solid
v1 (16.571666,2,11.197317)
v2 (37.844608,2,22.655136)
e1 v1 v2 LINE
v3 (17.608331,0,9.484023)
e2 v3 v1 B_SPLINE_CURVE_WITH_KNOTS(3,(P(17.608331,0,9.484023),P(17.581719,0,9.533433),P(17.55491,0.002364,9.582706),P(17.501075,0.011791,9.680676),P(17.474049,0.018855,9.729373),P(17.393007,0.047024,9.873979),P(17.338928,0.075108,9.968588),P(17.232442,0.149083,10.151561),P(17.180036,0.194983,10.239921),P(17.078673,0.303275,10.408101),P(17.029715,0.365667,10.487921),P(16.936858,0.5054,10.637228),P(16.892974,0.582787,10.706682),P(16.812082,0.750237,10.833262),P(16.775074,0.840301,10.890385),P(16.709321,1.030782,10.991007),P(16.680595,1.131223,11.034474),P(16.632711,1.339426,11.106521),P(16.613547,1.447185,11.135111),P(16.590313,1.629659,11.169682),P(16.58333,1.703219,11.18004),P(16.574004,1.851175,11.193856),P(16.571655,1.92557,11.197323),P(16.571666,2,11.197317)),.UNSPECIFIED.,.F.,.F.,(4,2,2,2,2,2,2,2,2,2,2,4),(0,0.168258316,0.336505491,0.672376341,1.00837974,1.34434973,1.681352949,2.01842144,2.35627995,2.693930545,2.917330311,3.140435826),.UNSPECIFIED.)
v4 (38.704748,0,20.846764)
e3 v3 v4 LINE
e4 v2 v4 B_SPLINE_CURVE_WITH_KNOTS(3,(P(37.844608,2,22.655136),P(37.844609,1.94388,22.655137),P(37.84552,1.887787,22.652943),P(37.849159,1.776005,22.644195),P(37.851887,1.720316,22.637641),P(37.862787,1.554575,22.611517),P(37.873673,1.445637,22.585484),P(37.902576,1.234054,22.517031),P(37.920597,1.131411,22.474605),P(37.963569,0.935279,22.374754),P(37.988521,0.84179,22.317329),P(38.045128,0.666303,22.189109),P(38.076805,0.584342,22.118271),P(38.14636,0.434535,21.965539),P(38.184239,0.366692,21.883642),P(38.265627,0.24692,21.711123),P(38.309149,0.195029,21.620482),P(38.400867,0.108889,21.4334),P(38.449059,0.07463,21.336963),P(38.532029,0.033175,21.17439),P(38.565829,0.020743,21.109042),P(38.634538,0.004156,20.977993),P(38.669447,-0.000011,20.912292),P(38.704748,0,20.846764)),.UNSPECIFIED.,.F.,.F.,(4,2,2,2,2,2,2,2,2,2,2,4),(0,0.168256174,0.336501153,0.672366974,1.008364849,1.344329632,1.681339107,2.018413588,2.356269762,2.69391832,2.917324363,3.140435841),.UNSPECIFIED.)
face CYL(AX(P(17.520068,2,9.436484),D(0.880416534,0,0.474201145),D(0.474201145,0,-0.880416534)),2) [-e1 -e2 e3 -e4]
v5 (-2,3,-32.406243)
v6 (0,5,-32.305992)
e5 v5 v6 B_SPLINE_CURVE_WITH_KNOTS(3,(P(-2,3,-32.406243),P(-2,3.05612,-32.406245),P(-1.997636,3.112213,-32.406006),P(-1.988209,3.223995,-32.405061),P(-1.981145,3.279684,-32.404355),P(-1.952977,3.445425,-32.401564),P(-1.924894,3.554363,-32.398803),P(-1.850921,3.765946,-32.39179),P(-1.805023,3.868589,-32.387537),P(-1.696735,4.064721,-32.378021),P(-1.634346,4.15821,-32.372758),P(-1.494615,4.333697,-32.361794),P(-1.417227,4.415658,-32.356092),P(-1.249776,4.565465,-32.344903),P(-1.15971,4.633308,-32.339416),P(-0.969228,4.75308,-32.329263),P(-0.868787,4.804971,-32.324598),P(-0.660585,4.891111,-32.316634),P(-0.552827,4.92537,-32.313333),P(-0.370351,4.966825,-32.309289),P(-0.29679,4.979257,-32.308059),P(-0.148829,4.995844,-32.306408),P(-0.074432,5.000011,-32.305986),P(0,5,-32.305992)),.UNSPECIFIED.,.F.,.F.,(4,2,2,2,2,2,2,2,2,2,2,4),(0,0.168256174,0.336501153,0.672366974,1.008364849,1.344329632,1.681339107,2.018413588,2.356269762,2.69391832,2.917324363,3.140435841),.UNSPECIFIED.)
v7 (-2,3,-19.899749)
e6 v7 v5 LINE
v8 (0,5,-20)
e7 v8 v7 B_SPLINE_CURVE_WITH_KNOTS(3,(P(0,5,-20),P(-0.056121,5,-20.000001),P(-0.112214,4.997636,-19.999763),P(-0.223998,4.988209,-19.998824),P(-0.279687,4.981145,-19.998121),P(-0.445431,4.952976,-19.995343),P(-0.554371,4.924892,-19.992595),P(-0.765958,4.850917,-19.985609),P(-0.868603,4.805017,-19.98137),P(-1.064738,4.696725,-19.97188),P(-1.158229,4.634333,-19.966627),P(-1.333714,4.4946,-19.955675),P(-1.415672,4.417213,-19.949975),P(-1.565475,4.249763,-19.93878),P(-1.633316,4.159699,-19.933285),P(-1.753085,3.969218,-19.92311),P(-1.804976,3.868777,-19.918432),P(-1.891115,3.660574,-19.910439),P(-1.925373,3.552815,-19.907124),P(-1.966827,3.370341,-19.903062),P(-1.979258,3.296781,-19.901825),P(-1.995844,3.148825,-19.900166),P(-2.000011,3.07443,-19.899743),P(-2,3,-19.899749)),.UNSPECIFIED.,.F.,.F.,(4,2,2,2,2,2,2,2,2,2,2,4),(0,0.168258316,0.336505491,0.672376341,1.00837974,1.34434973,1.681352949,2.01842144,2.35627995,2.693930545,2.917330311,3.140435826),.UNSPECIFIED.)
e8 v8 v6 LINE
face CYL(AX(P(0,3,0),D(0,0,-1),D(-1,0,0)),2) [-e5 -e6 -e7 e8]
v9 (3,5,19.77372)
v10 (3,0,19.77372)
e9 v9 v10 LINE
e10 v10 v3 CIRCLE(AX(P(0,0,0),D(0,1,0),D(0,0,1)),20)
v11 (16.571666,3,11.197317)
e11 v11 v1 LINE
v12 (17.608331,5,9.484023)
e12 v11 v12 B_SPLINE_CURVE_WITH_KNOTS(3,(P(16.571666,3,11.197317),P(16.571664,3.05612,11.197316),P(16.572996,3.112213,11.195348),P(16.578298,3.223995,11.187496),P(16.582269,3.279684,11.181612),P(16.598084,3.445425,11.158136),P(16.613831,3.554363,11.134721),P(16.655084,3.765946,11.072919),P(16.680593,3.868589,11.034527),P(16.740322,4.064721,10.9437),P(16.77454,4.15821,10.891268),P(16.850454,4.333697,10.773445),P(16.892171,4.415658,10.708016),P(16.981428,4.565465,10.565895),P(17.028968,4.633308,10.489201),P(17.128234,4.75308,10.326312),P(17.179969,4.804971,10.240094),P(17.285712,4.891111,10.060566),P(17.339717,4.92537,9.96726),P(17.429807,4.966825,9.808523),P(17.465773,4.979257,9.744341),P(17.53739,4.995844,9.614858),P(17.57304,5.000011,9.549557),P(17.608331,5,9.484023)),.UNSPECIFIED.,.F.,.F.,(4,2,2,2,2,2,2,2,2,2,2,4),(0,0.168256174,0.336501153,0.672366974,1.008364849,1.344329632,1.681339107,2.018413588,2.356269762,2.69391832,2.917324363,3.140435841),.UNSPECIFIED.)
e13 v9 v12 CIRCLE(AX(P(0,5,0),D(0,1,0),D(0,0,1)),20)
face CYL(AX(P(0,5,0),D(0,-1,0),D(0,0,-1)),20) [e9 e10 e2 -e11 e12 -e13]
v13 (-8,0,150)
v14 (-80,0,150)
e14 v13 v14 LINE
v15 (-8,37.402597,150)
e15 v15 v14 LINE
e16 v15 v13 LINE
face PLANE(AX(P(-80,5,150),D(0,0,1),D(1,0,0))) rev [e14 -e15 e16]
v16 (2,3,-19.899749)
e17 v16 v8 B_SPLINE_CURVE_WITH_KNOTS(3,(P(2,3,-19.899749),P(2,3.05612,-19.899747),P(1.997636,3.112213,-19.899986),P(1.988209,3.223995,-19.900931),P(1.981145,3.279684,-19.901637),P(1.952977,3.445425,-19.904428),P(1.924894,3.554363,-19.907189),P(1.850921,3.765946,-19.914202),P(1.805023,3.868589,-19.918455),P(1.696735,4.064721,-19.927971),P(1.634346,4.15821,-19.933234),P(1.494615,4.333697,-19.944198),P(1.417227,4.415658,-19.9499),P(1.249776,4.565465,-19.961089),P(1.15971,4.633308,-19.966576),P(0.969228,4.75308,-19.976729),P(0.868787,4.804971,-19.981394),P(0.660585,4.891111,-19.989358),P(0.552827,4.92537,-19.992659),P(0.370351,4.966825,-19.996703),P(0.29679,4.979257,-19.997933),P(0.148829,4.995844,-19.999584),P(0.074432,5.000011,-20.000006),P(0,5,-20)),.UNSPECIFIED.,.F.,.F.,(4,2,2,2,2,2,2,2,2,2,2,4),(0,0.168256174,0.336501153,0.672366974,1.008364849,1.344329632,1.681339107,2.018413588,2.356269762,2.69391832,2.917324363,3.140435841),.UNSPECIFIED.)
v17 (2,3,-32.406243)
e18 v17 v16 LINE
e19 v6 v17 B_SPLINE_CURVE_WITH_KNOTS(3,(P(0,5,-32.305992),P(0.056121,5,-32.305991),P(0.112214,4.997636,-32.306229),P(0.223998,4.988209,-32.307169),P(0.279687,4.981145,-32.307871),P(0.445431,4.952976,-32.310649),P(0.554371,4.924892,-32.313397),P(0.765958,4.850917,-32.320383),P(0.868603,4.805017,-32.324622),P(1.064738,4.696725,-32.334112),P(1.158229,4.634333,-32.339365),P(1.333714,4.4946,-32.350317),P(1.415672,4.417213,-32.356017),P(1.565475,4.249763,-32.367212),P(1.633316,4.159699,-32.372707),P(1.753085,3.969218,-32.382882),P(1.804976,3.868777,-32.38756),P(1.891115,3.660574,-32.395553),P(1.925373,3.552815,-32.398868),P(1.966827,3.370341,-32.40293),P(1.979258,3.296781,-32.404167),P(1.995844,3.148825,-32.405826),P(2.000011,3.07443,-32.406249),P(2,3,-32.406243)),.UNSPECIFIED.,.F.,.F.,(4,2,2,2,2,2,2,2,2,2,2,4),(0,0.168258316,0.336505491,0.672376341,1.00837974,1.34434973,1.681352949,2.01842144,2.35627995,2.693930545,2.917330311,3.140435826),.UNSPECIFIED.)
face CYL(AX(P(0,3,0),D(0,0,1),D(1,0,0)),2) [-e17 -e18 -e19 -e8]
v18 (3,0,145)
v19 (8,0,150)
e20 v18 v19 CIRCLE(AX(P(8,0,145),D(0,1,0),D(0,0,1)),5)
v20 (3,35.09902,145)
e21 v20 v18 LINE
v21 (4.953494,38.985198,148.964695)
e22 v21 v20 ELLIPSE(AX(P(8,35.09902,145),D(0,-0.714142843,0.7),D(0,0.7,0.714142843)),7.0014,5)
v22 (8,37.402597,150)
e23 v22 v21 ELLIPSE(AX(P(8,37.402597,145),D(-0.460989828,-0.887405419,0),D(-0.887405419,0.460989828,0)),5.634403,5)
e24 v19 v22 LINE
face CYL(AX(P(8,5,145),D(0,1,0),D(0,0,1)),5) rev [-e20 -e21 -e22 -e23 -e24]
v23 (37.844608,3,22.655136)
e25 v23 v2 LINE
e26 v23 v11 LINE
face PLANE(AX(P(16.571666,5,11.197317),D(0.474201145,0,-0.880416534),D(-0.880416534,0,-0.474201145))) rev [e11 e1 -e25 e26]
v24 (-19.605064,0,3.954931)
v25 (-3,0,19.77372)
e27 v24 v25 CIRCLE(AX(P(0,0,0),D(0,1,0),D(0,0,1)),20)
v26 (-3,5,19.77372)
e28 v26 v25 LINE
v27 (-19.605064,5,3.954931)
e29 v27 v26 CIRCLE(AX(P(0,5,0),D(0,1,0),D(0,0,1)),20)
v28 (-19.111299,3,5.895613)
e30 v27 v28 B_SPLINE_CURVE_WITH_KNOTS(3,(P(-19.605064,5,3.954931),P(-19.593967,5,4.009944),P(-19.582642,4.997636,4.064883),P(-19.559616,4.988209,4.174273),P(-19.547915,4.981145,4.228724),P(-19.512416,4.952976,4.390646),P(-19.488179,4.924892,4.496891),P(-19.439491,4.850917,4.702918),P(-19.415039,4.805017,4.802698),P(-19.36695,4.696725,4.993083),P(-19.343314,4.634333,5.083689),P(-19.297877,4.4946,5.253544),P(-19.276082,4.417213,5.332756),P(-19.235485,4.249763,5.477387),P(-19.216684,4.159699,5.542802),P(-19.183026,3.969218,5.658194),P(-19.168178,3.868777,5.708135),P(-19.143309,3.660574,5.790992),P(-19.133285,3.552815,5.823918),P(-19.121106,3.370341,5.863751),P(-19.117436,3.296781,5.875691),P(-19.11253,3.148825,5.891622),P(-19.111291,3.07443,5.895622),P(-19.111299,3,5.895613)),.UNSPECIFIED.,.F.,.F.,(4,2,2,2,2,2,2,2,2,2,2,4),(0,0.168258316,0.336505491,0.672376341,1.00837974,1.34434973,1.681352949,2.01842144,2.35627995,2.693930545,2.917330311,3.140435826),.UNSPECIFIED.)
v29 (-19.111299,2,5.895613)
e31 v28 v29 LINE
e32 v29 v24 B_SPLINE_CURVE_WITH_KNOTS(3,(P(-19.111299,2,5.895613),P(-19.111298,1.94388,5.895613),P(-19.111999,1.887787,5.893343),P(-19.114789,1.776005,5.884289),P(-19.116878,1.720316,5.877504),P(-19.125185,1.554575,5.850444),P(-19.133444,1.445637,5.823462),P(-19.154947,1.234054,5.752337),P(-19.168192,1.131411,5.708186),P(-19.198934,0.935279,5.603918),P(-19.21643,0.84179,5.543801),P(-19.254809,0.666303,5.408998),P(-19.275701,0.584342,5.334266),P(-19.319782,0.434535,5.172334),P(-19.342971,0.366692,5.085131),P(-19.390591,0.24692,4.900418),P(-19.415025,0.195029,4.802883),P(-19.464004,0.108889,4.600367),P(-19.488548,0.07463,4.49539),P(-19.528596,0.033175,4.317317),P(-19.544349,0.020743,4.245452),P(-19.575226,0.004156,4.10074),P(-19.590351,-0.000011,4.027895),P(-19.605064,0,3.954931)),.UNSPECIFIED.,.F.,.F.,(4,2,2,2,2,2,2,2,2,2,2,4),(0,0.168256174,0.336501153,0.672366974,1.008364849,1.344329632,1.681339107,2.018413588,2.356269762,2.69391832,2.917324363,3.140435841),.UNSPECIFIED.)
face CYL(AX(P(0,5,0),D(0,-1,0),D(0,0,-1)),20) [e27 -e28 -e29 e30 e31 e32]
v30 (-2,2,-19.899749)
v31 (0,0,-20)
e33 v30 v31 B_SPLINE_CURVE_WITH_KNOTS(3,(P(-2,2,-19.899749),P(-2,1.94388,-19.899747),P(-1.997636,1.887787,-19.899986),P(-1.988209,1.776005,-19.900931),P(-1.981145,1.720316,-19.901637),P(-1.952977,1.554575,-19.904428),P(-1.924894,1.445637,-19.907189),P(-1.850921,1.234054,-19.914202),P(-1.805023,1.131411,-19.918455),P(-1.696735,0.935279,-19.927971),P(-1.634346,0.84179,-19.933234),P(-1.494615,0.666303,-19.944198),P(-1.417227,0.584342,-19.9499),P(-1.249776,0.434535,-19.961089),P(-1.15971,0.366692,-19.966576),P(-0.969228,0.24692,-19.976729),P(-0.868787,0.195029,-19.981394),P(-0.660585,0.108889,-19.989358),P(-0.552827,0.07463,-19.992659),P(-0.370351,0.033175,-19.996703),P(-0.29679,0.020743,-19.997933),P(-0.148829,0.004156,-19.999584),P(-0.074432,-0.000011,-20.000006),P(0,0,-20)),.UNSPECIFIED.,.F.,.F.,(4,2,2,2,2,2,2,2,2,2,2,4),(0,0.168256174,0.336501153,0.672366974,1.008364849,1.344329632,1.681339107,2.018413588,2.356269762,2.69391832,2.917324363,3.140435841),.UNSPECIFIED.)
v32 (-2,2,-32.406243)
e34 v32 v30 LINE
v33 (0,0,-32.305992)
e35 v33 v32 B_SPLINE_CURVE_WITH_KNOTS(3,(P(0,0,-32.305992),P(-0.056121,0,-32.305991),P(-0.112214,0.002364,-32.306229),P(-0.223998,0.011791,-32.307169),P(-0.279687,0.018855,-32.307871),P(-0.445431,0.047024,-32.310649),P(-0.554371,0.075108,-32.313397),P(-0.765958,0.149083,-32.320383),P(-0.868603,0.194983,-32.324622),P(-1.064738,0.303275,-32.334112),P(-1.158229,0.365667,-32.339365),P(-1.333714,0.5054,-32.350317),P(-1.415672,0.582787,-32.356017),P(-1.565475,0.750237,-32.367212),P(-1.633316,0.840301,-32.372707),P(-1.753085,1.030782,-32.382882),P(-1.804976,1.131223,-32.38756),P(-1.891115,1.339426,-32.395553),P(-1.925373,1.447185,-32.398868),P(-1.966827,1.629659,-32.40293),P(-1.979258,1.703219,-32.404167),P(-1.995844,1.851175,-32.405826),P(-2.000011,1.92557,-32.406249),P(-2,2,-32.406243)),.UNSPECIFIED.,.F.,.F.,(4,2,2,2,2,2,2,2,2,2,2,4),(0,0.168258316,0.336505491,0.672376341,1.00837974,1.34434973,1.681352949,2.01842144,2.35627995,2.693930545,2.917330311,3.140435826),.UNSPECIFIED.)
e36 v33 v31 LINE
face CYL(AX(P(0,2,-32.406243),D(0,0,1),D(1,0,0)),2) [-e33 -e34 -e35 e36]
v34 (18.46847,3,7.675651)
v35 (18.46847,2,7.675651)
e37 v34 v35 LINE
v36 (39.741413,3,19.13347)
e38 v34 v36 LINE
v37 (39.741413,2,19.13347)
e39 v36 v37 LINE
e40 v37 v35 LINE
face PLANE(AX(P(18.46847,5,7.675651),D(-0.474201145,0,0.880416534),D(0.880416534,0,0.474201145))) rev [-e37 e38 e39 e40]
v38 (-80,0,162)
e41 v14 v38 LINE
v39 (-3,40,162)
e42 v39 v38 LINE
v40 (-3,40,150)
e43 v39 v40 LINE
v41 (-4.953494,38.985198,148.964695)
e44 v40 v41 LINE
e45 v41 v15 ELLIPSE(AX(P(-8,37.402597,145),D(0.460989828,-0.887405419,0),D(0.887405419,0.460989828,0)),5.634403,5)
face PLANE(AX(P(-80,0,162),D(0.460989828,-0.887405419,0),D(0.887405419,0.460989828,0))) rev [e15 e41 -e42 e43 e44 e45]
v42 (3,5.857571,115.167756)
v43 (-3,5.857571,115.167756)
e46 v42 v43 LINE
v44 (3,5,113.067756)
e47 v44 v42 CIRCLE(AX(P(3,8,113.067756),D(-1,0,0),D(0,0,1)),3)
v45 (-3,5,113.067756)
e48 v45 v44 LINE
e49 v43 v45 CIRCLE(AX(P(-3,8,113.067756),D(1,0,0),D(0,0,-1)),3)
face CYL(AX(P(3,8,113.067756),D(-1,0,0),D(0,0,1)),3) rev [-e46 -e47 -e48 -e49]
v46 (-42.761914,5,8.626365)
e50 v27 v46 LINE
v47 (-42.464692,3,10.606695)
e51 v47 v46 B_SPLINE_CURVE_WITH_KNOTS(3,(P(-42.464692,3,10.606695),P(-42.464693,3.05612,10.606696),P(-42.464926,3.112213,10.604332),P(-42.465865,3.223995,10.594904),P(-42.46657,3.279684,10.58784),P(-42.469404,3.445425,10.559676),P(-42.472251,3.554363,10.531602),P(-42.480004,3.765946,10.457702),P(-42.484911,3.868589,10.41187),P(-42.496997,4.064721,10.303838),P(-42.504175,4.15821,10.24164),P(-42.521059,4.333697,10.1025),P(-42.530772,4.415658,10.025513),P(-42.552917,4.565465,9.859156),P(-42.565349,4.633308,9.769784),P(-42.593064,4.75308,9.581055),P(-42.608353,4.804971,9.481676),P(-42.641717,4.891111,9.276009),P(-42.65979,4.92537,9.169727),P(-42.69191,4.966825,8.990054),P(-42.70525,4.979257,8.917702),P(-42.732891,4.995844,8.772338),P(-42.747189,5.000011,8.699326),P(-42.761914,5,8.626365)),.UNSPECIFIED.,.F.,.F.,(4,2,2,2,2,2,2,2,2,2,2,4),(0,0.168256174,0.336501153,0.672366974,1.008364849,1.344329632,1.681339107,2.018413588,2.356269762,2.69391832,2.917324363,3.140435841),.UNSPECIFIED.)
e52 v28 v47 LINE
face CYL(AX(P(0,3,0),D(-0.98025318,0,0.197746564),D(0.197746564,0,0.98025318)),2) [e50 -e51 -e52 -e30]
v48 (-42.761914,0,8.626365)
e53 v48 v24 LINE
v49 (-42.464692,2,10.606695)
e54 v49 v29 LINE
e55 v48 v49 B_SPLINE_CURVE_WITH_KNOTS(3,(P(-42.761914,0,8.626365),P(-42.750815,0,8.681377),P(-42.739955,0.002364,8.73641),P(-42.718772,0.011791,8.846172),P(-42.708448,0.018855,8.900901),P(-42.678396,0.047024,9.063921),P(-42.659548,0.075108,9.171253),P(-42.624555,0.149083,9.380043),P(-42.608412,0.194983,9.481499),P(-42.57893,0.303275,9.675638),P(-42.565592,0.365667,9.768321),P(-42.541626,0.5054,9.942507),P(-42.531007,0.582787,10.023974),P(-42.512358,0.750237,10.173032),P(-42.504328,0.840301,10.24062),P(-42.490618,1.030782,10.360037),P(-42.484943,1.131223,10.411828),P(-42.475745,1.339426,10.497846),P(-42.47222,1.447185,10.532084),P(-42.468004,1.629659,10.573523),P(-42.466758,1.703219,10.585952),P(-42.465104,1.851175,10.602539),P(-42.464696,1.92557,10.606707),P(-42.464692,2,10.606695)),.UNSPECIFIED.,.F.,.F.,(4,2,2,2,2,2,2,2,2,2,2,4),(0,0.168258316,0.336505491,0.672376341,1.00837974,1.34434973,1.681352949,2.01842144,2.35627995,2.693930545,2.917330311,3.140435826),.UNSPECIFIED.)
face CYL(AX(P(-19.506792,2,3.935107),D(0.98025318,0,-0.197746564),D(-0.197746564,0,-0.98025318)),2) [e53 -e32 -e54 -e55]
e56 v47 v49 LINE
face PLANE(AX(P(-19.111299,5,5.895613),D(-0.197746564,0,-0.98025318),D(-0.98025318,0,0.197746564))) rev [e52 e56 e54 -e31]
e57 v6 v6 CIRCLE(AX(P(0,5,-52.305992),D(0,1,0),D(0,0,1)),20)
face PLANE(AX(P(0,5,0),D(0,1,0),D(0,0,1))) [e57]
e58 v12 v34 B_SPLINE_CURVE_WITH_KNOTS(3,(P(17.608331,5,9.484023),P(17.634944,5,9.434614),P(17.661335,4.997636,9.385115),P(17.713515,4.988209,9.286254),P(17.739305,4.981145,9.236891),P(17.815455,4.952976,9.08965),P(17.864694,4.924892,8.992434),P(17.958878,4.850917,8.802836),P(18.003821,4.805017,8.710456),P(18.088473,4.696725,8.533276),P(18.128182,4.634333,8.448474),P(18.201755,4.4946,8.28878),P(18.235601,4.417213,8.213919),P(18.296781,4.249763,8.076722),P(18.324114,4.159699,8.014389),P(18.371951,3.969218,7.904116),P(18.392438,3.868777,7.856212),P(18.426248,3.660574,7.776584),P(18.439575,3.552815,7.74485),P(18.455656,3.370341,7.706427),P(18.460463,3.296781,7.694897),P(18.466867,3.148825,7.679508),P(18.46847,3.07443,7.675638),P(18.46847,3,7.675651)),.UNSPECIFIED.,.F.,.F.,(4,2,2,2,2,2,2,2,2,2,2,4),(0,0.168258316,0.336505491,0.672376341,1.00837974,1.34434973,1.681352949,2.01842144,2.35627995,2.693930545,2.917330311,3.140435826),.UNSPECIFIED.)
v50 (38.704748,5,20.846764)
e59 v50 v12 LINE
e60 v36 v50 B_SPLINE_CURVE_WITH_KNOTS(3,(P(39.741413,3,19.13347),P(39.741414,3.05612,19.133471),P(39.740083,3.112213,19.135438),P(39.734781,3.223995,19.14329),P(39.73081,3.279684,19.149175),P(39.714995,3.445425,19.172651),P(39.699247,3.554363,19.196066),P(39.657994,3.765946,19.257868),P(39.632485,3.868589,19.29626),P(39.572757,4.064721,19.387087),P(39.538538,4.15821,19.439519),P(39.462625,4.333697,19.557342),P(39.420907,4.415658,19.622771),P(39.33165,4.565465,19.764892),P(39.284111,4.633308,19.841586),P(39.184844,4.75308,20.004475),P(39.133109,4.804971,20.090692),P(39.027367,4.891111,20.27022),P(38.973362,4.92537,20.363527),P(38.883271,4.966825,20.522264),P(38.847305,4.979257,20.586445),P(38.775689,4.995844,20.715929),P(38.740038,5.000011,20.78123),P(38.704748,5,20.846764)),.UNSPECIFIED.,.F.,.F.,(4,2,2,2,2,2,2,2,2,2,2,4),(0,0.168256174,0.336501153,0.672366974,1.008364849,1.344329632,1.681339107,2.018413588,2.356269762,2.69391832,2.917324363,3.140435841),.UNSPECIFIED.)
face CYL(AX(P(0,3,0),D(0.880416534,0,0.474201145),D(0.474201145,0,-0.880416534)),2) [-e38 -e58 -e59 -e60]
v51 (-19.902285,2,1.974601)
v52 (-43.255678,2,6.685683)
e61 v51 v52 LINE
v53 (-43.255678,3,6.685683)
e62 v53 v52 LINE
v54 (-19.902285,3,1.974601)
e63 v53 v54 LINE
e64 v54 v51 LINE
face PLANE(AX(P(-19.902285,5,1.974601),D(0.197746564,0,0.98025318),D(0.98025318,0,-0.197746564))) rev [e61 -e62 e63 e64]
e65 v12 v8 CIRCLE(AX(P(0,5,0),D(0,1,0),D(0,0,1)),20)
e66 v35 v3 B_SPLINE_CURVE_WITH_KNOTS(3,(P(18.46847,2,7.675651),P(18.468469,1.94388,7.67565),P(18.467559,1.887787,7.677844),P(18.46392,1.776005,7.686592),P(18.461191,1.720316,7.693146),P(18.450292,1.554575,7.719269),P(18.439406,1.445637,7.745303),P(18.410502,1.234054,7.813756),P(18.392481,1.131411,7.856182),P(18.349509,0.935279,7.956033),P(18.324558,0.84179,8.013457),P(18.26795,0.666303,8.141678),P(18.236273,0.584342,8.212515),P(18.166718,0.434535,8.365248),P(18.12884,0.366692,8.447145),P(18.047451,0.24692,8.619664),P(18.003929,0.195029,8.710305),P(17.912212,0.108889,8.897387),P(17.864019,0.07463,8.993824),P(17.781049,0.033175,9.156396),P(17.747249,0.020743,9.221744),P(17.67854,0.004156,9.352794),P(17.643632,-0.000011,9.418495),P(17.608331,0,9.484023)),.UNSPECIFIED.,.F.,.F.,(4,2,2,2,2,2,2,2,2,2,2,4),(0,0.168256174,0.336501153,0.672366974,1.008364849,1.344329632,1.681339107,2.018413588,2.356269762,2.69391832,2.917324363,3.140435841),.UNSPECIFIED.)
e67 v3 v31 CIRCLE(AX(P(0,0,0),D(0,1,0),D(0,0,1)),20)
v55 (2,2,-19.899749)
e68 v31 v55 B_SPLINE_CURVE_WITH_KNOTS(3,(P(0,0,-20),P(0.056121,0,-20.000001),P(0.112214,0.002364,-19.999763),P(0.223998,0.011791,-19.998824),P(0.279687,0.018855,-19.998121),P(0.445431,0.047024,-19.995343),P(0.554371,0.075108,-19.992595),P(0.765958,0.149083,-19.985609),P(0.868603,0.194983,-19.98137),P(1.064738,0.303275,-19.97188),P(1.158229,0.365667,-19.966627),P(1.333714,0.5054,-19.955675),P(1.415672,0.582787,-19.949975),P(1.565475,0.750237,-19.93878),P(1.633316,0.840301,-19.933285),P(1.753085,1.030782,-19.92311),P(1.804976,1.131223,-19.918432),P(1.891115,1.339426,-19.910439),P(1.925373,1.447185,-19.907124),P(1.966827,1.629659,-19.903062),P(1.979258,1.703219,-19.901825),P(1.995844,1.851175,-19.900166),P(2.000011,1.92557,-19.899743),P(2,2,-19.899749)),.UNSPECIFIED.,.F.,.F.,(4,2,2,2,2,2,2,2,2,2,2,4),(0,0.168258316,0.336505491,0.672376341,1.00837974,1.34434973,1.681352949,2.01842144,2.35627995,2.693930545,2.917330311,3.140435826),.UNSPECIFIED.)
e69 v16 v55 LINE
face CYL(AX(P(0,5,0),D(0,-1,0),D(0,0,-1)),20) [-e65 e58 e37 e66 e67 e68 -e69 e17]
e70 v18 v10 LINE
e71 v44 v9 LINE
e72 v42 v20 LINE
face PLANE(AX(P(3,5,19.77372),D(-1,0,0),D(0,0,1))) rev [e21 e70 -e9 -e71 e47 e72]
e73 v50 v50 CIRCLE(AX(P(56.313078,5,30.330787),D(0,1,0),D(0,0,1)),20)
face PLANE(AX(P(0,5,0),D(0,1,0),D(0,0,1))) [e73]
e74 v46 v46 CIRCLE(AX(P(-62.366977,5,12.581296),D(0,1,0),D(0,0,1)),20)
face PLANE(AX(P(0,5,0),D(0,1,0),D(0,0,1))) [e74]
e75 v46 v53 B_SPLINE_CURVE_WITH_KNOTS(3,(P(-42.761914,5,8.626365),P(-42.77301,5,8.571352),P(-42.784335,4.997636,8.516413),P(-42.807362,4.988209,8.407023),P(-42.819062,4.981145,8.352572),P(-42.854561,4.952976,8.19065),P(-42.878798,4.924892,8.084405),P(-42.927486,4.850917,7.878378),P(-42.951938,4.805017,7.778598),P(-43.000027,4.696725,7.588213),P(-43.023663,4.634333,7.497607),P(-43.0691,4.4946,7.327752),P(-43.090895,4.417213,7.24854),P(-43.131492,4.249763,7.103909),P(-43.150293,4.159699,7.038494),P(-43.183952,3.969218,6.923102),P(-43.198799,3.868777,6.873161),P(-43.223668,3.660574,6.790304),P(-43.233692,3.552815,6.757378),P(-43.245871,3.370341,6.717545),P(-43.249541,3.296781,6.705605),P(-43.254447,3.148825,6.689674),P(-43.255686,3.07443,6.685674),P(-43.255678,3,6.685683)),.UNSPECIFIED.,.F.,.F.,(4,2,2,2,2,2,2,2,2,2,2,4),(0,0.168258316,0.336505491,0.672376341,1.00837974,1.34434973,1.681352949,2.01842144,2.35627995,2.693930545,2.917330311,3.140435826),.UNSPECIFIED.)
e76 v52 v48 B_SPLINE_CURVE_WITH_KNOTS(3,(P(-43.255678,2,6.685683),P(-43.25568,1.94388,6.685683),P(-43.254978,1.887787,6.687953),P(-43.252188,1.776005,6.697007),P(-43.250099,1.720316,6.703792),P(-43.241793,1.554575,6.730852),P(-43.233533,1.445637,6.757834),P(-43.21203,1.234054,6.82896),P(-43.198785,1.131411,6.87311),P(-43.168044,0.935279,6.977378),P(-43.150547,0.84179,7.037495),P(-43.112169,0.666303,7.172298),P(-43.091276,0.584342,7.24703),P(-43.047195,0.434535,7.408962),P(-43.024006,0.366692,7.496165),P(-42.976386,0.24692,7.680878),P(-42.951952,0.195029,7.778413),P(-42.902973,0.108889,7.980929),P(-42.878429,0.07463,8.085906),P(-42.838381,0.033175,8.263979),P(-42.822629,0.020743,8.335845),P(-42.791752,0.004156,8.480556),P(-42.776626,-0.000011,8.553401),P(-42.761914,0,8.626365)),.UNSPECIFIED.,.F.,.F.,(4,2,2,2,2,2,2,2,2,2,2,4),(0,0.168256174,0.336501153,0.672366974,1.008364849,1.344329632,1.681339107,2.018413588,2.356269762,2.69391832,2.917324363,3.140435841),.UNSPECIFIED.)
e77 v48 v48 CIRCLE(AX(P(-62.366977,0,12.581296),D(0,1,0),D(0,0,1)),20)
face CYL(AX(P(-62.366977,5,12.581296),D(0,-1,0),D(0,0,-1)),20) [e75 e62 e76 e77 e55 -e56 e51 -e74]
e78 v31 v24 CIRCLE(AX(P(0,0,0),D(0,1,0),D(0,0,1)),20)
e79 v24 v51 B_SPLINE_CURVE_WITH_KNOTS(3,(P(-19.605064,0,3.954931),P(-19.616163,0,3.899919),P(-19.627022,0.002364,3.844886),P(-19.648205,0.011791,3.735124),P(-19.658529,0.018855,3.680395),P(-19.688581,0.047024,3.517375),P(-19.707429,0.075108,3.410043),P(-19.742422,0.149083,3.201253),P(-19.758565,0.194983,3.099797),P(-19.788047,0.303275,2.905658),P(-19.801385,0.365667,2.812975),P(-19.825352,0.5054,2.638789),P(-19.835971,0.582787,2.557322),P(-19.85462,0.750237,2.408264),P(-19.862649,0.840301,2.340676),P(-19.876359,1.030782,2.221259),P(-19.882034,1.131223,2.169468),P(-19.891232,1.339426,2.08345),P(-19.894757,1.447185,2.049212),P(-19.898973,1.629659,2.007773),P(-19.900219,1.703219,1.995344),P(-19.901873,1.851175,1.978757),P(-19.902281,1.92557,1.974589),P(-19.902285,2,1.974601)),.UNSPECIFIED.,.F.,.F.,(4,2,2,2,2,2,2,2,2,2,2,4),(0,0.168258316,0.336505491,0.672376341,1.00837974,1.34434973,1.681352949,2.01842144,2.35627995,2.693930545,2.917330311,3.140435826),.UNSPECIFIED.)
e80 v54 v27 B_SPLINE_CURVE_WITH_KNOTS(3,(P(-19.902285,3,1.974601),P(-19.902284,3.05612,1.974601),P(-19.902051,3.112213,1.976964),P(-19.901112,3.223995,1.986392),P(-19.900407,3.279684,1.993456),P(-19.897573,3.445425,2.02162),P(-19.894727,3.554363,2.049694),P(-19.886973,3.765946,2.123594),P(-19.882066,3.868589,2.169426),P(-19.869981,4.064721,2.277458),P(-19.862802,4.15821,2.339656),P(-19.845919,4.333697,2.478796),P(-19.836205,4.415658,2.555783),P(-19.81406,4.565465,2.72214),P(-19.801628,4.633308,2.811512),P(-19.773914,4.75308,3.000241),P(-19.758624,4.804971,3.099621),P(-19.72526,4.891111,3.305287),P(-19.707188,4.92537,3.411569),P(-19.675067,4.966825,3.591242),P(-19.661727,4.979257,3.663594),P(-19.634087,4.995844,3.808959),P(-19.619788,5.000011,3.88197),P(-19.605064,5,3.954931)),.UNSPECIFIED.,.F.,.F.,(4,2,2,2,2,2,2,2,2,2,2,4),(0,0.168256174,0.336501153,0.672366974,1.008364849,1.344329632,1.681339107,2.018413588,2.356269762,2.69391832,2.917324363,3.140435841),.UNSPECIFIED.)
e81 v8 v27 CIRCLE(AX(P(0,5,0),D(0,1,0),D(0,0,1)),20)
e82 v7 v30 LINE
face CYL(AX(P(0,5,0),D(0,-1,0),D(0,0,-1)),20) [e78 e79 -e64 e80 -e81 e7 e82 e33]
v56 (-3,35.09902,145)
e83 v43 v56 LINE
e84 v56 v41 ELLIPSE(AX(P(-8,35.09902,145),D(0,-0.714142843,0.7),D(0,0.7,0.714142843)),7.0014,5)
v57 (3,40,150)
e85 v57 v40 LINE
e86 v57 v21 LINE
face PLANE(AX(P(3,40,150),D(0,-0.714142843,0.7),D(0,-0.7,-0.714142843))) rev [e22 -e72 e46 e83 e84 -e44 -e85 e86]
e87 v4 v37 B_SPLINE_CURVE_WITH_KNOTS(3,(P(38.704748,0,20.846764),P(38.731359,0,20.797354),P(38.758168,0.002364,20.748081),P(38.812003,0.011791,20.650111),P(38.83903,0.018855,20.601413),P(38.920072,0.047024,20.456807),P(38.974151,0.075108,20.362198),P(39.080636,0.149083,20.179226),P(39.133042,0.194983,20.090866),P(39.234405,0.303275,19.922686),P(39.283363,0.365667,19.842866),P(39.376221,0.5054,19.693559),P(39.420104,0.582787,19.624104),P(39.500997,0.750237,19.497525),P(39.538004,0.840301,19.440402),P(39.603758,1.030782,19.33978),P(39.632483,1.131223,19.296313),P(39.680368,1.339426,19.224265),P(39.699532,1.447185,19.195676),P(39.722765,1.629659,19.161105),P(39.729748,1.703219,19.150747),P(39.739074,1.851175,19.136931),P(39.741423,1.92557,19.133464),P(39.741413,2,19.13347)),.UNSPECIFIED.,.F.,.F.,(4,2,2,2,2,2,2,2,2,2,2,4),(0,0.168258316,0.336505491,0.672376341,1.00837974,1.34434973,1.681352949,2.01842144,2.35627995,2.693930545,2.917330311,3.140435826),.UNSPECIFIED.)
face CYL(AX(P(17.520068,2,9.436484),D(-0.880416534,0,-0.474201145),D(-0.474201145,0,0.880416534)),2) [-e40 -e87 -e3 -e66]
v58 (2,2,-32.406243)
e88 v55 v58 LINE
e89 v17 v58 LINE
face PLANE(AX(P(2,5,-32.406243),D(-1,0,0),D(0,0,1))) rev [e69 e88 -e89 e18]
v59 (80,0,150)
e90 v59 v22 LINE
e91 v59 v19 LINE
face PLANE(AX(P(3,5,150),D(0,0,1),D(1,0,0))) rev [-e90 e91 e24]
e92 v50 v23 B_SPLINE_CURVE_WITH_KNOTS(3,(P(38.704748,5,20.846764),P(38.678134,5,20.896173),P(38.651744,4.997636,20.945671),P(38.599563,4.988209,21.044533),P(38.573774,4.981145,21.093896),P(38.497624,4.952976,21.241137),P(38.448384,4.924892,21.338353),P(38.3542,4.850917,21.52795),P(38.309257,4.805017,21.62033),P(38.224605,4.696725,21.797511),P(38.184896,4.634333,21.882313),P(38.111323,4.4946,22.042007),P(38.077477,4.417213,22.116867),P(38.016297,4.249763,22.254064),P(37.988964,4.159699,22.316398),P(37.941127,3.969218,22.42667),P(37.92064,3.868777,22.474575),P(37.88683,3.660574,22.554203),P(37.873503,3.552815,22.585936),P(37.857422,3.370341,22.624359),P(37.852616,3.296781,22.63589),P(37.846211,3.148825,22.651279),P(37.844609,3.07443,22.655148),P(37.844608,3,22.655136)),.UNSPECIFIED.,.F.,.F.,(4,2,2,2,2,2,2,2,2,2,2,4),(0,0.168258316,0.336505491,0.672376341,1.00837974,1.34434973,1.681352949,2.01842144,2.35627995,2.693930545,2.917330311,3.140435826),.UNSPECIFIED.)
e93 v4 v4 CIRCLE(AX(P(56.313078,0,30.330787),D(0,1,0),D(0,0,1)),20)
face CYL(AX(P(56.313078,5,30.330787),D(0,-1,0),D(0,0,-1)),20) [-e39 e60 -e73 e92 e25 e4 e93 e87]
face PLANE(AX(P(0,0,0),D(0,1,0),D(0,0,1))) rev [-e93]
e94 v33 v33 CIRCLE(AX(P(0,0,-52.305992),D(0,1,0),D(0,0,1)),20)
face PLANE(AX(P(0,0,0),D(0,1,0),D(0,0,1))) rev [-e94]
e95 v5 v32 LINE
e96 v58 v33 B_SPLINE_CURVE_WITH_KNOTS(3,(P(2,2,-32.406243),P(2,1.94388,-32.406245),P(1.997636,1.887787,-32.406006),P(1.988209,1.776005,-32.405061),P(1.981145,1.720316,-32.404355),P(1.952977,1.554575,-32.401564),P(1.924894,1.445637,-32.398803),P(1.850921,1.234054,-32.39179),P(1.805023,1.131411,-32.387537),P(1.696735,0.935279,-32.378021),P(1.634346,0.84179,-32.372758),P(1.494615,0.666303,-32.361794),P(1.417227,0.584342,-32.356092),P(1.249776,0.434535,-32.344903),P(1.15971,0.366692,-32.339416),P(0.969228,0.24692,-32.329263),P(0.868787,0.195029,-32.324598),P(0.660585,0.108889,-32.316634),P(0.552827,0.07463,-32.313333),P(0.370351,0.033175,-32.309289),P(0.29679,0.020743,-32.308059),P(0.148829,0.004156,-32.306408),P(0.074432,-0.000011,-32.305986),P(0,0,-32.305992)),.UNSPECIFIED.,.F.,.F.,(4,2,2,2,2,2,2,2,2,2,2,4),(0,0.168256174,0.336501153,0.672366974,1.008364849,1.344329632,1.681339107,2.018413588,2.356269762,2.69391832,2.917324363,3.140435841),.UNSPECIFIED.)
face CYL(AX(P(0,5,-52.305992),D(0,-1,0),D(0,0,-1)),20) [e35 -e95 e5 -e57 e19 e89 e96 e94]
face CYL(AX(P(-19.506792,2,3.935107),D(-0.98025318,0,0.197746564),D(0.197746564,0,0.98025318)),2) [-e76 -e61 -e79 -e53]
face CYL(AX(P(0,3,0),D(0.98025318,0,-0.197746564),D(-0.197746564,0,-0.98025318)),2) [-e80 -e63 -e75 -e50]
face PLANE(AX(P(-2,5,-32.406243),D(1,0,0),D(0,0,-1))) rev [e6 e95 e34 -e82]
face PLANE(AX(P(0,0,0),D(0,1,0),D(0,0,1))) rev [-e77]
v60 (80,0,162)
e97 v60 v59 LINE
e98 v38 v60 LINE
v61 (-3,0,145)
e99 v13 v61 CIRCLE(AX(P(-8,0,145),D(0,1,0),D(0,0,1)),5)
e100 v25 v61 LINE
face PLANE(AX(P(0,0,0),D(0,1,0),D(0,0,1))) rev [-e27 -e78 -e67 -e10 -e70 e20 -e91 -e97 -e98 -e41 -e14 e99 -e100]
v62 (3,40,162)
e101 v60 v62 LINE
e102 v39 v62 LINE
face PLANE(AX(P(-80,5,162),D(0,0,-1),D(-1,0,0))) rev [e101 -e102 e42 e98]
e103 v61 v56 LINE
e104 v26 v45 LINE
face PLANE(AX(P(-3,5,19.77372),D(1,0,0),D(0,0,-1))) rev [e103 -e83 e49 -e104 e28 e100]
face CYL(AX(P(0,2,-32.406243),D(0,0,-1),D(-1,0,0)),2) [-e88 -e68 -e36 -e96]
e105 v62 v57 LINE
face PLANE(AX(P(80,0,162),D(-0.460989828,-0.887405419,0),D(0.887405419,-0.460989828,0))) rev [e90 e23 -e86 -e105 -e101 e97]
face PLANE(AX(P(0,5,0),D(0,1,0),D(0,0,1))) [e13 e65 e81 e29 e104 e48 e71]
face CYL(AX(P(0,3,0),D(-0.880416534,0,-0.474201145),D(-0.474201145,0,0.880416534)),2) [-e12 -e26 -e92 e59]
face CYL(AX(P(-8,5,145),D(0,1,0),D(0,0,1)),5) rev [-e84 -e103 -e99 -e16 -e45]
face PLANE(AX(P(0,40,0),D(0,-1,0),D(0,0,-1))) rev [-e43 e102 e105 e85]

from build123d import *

# Parameters (mm, degrees)
BOSS_EXTRUDE1_DEPTH = 5
BOSS_EXTRUDE2_DEPTH = 3
SKETCH3_W           = 160
SKETCH3_H           = 12
BOSS_EXTRUDE3_DEPTH = 35
FILLET5_R           = 3
CUT_EXTRUDE1_DEPTH  = 241.425192154
FILLET12_R          = 5
FILLET13_R          = 2
FILLET14_R          = 2
FILLET15_R          = 2


# Some blends are built 0.0001 mm under size
with BuildPart() as part:
    # Sketch1 → Boss-Extrude1 (new body)
    with BuildSketch(Plane(origin=(0, 0, 0), x_dir=(1, 0, 0), z_dir=(0, 1, 0))):
        with BuildLine():
            Line((-80, -162), (80, -162))
            Line((80, -162), (80, -150))
            Line((80, -150), (3, -150))
            Line((3, -150), (3, -19.773719933))
            ThreePointArc((3, -19.773719933), (10.684156309, -16.90706373), (16.571665535, -11.197316705))
            Line((16.571665535, -11.197316705), (37.844608185, -22.65513623))
            ThreePointArc((37.844608185, -22.65513623), (73.921408989, -39.814809694), (39.741412764, -19.133470092))
            Line((39.741412764, -19.133470092), (18.468470115, -7.675650567))
            ThreePointArc((18.468470115, -7.675650567), (17.170912293, 10.25474383), (2, 19.899748742))
            Line((2, 19.899748742), (2, 32.406243273))
            ThreePointArc((2, 32.406243273), (0, 72.305992015), (-2, 32.406243273))
            Line((-2, 32.406243273), (-2, 19.899748742))
            ThreePointArc((-2, 19.899748742), (-15.477380683, 12.666913088), (-19.902285109, -1.97460058))
            Line((-19.902285109, -1.97460058), (-43.255678368, -6.68568275))
            ThreePointArc((-43.255678368, -6.68568275), (-81.972040815, -16.536227331), (-42.464692112, -10.606695469))
            Line((-42.464692112, -10.606695469), (-19.111298852, -5.895613299))
            ThreePointArc((-19.111298852, -5.895613299), (-13.052886469, -15.153288581), (-3, -19.773719933))
            Line((-3, -19.773719933), (-3, -150))
            Line((-3, -150), (-80, -150))
            Line((-80, -150), (-80, -162))
        make_face()
    extrude(amount=BOSS_EXTRUDE1_DEPTH)

    # Sketch2 → Boss-Extrude2 (add, symmetric)
    with BuildSketch(Plane(origin=(0, 0, 0), x_dir=(0, 0, -1), z_dir=(1, 0, 0))):
        Polygon((-150, 5), (-150, 40), (-114.292857857, 5), align=None)
    extrude(amount=BOSS_EXTRUDE2_DEPTH, both=True)

    # Sketch3 → Boss-Extrude3 (add)
    with BuildSketch(Plane(origin=(0, 5, 0), x_dir=(1, 0, 0), z_dir=(0, 1, 0))):
        with Locations((0, -156)):
            Rectangle(SKETCH3_W, SKETCH3_H)
    extrude(amount=BOSS_EXTRUDE3_DEPTH)

    # Fillet5
    fillet5_edges = [part.edges().sort_by_distance(p)[0] for p in [
        (0, 5, 114.292857857),
    ]]
    fillet(fillet5_edges, radius=FILLET5_R)

    # Sketch4 → Cut-Extrude1 (cut, through all)
    with BuildSketch(Plane(origin=(0, 0, 150), x_dir=(-1, 0, 0), z_dir=(0, 0, -1))):
        Polygon((80, 0), (3, 40), (80, 40), align=None)
        Polygon((-80, 40), (-80, 0), (-3, 40), align=None)
    extrude(amount=-CUT_EXTRUDE1_DEPTH, mode=Mode.SUBTRACT)

    # Fillet12
    # the kernel refuses this fillet: 5 mm, written as the material it adds along each edge
    with BuildSketch(Plane(origin=(-3, 0, 150), x_dir=(0, 0, -1), z_dir=(0, 1, 0))) as fillet12_piece_1_section:
        with BuildLine():
            CenterArc((FILLET12_R, FILLET12_R), FILLET12_R, 180, 90)
            Line((0, FILLET12_R), (0, 0))
            Line((0, 0), (FILLET12_R, 0))
        make_face()
    fillet12_piece_1 = extrude(amount=52.5, mode=Mode.PRIVATE)
    fillet12_piece_1 = split(fillet12_piece_1, bisect_by=Plane(origin=(-4.134914786, 29.296214811, 139.07995488), z_dir=(0, -0.7141428428542851, 0.7)), keep=Keep.TOP, mode=Mode.PRIVATE)
    fillet12_piece_1 = split(fillet12_piece_1, bisect_by=Plane(origin=(-12.366288086, 35.1343958, 148.888985243), z_dir=(0.4609898282276015, -0.8874054193381323, 0)), keep=Keep.TOP, mode=Mode.PRIVATE)
    add(fillet12_piece_1)
    with BuildSketch(Plane(origin=(3, 0, 150), x_dir=(0, 0, -1), z_dir=(0, 1, 0))) as fillet12_piece_2_section:
        with BuildLine():
            CenterArc((FILLET12_R, -FILLET12_R), FILLET12_R, 90, 90)
            Line((0, -FILLET12_R), (0, 0))
            Line((0, 0), (FILLET12_R, 0))
        make_face()
    fillet12_piece_2 = extrude(amount=52.5, mode=Mode.PRIVATE)
    fillet12_piece_2 = split(fillet12_piece_2, bisect_by=Plane(origin=(4.134914786, 29.296214811, 139.07995488), z_dir=(0, -0.7141428428542851, 0.7)), keep=Keep.TOP, mode=Mode.PRIVATE)
    fillet12_piece_2 = split(fillet12_piece_2, bisect_by=Plane(origin=(12.366288086, 35.1343958, 148.888985243), z_dir=(-0.4609898282276015, -0.8874054193381323, 0)), keep=Keep.TOP, mode=Mode.PRIVATE)
    add(fillet12_piece_2)

    # Fillet13
    fillet13_edges = [part.edges().sort_by_distance(p)[0] for p in [
        (-30.787995482, 0, 8.251154384),
        (-31.578981738, 0, 4.330141665),
        (-31.578981738, 5, 4.330141665),
        (-30.787995482, 5, 8.251154384),
    ]]
    fillet(fillet13_edges, radius=FILLET13_R - 0.0001)  # a hair under: the kernel refuses the full size

    # Fillet14
    fillet14_edges = [part.edges().sort_by_distance(p)[0] for p in [
        (27.20813686, 5, 16.926226468),
        (29.104941439, 5, 13.40456033),
        (29.104941439, 0, 13.40456033),
        (27.20813686, 0, 16.926226468),
    ]]
    fillet(fillet14_edges, radius=FILLET14_R - 0.0001)  # a hair under: the kernel refuses the full size

    # Fillet15
    fillet15_edges = [part.edges().sort_by_distance(p)[0] for p in [
        (-2, 0, -26.152996008),
        (2, 0, -26.152996008),
        (2, 5, -26.152996008),
        (-2, 5, -26.152996008),
    ]]
    fillet(fillet15_edges, radius=FILLET15_R - 0.0001)  # a hair under: the kernel refuses the full size


solid = part.part
